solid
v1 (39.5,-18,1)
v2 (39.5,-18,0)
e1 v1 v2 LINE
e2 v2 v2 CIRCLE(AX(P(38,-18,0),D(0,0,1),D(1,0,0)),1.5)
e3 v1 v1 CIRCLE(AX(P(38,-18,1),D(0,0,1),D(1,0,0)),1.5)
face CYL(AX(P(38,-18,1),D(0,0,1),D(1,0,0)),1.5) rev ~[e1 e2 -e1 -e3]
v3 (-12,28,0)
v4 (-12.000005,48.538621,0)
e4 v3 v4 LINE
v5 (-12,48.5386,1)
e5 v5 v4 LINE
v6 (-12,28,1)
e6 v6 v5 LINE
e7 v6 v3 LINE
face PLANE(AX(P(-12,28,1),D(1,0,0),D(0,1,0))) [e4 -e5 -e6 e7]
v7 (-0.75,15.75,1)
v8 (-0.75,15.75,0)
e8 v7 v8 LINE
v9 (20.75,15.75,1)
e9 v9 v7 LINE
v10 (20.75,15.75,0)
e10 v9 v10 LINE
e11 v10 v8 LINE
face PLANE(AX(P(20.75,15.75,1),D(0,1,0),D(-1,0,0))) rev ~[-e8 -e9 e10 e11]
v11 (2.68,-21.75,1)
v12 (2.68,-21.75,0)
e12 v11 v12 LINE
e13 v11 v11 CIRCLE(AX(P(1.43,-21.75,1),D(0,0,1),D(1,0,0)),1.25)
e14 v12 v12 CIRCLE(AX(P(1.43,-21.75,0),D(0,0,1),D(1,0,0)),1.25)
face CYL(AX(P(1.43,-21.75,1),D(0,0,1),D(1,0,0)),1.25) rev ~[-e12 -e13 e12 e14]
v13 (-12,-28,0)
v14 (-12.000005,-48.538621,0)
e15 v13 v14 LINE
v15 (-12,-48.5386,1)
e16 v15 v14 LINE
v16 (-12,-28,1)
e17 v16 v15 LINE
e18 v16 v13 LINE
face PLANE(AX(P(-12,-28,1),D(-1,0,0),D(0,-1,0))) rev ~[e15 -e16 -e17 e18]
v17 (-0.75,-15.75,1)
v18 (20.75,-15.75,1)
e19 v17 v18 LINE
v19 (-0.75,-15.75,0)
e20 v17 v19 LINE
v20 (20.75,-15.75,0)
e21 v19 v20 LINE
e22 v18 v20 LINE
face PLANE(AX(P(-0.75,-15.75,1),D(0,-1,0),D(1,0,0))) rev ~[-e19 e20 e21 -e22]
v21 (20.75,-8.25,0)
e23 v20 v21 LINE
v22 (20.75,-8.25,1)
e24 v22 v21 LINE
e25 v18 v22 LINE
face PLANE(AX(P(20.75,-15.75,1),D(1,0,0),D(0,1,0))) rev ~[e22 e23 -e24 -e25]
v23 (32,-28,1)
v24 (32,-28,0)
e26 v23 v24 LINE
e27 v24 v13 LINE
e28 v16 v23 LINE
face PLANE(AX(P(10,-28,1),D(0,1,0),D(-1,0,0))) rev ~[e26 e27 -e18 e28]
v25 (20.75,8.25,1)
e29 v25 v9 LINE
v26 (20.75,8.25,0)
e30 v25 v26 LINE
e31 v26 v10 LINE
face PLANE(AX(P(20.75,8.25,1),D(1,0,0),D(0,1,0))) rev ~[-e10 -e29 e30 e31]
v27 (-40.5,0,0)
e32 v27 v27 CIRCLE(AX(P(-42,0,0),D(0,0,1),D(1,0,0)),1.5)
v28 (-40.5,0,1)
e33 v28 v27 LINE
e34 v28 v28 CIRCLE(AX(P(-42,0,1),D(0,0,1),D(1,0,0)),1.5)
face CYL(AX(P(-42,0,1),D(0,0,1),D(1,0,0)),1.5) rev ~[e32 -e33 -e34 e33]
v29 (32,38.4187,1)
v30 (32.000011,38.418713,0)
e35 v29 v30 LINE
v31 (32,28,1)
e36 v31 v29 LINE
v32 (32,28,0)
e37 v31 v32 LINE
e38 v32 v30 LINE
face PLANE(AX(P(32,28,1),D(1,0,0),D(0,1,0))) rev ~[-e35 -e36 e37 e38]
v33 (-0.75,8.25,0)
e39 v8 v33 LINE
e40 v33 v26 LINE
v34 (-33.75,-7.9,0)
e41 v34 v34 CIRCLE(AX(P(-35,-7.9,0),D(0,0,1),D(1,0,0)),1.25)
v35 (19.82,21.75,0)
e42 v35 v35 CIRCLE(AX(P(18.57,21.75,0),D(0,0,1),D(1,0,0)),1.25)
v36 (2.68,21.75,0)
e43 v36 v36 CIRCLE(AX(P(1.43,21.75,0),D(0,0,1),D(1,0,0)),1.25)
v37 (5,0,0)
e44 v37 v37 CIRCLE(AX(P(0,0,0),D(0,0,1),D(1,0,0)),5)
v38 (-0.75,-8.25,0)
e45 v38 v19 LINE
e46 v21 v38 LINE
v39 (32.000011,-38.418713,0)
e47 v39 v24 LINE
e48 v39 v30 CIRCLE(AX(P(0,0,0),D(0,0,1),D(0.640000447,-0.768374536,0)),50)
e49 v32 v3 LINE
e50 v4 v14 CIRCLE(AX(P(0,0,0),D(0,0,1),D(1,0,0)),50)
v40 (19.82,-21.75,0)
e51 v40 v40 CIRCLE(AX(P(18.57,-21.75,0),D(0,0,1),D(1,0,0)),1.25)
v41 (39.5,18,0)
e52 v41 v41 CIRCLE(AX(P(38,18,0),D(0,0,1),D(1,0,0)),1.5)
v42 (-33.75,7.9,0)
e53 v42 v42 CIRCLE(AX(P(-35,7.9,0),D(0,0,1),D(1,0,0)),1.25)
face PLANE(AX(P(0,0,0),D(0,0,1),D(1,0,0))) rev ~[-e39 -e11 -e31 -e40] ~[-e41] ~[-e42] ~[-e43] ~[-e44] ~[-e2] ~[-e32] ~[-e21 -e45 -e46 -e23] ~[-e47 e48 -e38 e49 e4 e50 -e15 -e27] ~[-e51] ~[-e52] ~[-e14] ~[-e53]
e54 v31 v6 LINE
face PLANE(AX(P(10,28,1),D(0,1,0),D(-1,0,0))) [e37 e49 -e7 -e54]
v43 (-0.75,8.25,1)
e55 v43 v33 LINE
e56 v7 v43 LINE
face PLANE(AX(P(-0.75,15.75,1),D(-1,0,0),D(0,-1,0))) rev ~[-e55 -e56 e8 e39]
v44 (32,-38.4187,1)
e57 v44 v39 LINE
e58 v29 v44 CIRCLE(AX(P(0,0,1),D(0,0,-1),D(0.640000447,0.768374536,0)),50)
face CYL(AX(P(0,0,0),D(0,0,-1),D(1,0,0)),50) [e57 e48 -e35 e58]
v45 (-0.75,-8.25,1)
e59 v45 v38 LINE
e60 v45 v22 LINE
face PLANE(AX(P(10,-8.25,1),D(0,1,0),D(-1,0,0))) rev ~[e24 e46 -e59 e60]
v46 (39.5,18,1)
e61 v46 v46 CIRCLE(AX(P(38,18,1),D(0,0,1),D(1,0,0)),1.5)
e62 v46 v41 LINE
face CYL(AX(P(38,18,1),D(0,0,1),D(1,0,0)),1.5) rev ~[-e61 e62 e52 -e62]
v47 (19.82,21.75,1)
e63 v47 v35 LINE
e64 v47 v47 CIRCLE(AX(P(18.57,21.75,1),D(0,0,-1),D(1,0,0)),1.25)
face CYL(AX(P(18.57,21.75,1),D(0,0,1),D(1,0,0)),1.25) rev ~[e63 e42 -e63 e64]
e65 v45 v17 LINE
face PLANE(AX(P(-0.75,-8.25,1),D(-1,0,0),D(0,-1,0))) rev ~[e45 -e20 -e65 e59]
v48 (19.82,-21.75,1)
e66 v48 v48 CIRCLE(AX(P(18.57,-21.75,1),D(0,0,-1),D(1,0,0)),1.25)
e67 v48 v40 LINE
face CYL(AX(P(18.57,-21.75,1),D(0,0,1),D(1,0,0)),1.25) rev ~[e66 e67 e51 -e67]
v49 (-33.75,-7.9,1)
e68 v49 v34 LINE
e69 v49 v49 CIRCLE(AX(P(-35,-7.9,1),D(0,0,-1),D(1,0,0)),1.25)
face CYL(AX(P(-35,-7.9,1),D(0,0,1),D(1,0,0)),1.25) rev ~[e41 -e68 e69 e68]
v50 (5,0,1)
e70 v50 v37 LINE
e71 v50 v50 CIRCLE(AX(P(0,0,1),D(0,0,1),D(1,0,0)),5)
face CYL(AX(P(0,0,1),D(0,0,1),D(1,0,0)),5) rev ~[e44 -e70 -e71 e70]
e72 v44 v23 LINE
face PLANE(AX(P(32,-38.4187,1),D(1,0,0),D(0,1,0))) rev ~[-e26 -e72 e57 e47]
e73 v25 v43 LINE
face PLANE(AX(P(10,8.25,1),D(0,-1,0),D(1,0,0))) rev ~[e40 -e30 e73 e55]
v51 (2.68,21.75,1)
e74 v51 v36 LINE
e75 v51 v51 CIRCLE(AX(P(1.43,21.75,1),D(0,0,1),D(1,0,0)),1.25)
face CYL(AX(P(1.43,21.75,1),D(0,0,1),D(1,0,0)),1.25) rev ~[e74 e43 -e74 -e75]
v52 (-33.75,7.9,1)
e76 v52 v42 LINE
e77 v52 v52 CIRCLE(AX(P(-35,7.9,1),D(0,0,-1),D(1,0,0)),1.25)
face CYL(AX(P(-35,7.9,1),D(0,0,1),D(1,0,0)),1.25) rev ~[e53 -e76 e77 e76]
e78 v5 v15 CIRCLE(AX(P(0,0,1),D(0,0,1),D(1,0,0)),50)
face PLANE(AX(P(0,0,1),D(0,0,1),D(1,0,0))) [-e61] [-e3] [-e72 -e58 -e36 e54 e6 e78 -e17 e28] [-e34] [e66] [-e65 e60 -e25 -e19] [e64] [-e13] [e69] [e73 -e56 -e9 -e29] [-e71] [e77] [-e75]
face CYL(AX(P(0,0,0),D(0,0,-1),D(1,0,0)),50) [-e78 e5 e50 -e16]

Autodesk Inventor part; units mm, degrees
ref_plane "YZ Plane" through (0, 0, 0) normal (1, 0, 0) x (0, 1, 0)
ref_plane "XZ Plane" through (0, 0, 0) normal (0, 1, 0) x (-1, 0, 0)
ref_plane "XY Plane" through (0, 0, 0) normal (0, 0, 1) x (1, 0, 0)
sketch "Sketch1" plane through (0, 0, 0) normal (0, 0, 1) x (1, 0, 0)
  circle A0 centre (0, 0) radius 50
  dimension "d0" = 100
extrude "Extrusion1" add sketch "Sketch1" along normal blind 1
sketch "Sketch3" plane through (0, 0, 1) normal (0, 0, 1) x (1, 0, 0)
  circle A0 centre (0, 0) radius 50 construction
  line L0 (50, 0) -> (-50, 0)
  line L1 (10, 28) -> (-12, 28)
  line L2 (10, 28) -> (32, 28)
  line L3 (32, 28) -> (32, 38.4187)
  line L4 (-12, 28) -> (-12, 48.5386)
  line L5 (0, 0) -> (0, 50) construction
  arc A1 (32, 38.4187) -> (-12, 48.5386) centre (0, 0) ccw
  line L6 (32, -38.4187) -> (32, -28)
  line L7 (32, -28) -> (10, -28)
  line L8 (10, -28) -> (-12, -28)
  line L9 (-12, -28) -> (-12, -48.5386)
  line L10 (0, 0) -> (0, -50) construction
  arc A2 (-12, -48.5386) -> (32, -38.4187) centre (0, 0) ccw
  arc A3 (32, 38.4187) -> (-12, 48.5386) centre (0, 0) ccw
  dimension "d18" = 100
  dimension "d19" = 44
  dimension "d21" = 22
  dimension "d22" = 10
  dimension "d23" = 44
  dimension "d24" = 22
  dimension "d25" = 10
extrude "Extrusion4" cut sketch "Sketch3" against normal through all
sketch "Sketch4" plane through (0, 0, 1) normal (0, 0, 1) x (1, 0, 0)
  line L0 (0, 0) -> (10, 0)
  line L1 (10, 0) -> (10, 12)
  line L2 (10, 0) -> (10, -12)
  line L3 (-0.75, -15.75) -> (20.75, -15.75)
  line L4 (20.75, -15.75) -> (20.75, -8.25)
  line L5 (20.75, -8.25) -> (-0.75, -8.25)
  line L6 (-0.75, -8.25) -> (-0.75, -15.75)
  line L7 (-0.75, -15.75) -> (20.75, -8.25) construction
  line L8 (20.75, -15.75) -> (-0.75, -8.25) construction
  line L9 (-0.75, 8.25) -> (20.75, 8.25)
  line L10 (20.75, 8.25) -> (20.75, 15.75)
  line L11 (20.75, 15.75) -> (-0.75, 15.75)
  line L12 (-0.75, 15.75) -> (-0.75, 8.25)
  line L13 (-0.75, 8.25) -> (20.75, 15.75) construction
  line L14 (20.75, 8.25) -> (-0.75, 15.75) construction
  dimension "d28" = 10
  dimension "d29" = 12
  dimension "d30" = 12
  dimension "d31" = 21.5
  dimension "d32" = 7.5
  dimension "d33" = 21.5
  dimension "d34" = 7.5
extrude "Extrusion5" cut sketch "Sketch4" against normal through all
sketch "Sketch5" plane through (0, 0, 1) normal (0, 0, 1) x (1, 0, 0)
  circle A0 centre (0, 0) radius 5
  dimension "d37" = 10
extrude "Extrusion6" cut sketch "Sketch5" against normal through all
sketch "Sketch6" plane through (0, 0, 1) normal (0, 0, 1) x (1, 0, 0)
  line L0 (20.75, -15.75) -> (-0.75, -15.75) projected
  line L1 (-0.75, 15.75) -> (20.75, 15.75) projected
  line L2 (20.75, 15.75) -> (-0.75, 15.75) projected
  line L3 (10, 15.75) -> (10, 21.75)
  line L4 (10, -15.75) -> (10, -21.75)
  line L5 (1.43, 21.75) -> (18.57, 21.75)
  line L6 (1.43, -21.75) -> (18.57, -21.75)
  circle A0 centre (1.43, 21.75) radius 1.25
  circle A1 centre (18.57, 21.75) radius 1.25
  circle A2 centre (1.43, -21.75) radius 1.25
  circle A3 centre (18.57, -21.75) radius 1.25
  point P0 (0, 0)
  dimension "d40" = 6
  dimension "d41" = 6
  dimension "d42" = 17.14
  dimension "d43" = 17.14
  dimension "d44" = 2.5
  dimension "d45" = 2.5
  dimension "d46" = 2.5
  dimension "d47" = 2.5
extrude "Extrusion7" cut sketch "Sketch6" against normal through all
sketch "Sketch7" plane through (0, 0, 1) normal (0, 0, 1) x (1, 0, 0)
  line L0 (0, 0) -> (-35, 0)
  line L1 (-35, -7.9) -> (-35, 7.9)
  circle A0 centre (-35, -7.9) radius 1.25
  circle A1 centre (-35, 7.9) radius 1.25
  dimension "d50" = 35
  dimension "d51" = 15.8
  dimension "d52" = 2.5
  dimension "d53" = 2.5
extrude "Extrusion8" cut sketch "Sketch7" against normal through all
sketch "Sketch8" plane through (0, 0, 1) normal (0, 0, 1) x (1, 0, 0)
  line L0 (0, 0) -> (-42, 0) construction
  line L1 (0, 0) -> (38, 0) construction
  line L2 (38, 0) -> (38, 18) construction
  line L3 (38, 0) -> (38, -18) construction
  circle A0 centre (-42, 0) radius 1.5
  circle A1 centre (38, 18) radius 1.5
  circle A2 centre (38, -18) radius 1.5
  dimension "d56" = 42
  dimension "d57" = 38
  dimension "d58" = 18
  dimension "d59" = 3
extrude "Extrusion9" cut sketch "Sketch8" against normal through all
equation "\"d23\" = d19"
equation "\"d24\" = d21"
equation "\"d25\" = d22"
equation "\"d28\" = d22"
equation "\"d29\" = d30"
equation "\"d33\" = d31"
equation "\"d34\" = d32"
equation "\"d38\" = d37"
equation "\"d43\" = d42"
properties part number "Base Inferior" material "Glass"
